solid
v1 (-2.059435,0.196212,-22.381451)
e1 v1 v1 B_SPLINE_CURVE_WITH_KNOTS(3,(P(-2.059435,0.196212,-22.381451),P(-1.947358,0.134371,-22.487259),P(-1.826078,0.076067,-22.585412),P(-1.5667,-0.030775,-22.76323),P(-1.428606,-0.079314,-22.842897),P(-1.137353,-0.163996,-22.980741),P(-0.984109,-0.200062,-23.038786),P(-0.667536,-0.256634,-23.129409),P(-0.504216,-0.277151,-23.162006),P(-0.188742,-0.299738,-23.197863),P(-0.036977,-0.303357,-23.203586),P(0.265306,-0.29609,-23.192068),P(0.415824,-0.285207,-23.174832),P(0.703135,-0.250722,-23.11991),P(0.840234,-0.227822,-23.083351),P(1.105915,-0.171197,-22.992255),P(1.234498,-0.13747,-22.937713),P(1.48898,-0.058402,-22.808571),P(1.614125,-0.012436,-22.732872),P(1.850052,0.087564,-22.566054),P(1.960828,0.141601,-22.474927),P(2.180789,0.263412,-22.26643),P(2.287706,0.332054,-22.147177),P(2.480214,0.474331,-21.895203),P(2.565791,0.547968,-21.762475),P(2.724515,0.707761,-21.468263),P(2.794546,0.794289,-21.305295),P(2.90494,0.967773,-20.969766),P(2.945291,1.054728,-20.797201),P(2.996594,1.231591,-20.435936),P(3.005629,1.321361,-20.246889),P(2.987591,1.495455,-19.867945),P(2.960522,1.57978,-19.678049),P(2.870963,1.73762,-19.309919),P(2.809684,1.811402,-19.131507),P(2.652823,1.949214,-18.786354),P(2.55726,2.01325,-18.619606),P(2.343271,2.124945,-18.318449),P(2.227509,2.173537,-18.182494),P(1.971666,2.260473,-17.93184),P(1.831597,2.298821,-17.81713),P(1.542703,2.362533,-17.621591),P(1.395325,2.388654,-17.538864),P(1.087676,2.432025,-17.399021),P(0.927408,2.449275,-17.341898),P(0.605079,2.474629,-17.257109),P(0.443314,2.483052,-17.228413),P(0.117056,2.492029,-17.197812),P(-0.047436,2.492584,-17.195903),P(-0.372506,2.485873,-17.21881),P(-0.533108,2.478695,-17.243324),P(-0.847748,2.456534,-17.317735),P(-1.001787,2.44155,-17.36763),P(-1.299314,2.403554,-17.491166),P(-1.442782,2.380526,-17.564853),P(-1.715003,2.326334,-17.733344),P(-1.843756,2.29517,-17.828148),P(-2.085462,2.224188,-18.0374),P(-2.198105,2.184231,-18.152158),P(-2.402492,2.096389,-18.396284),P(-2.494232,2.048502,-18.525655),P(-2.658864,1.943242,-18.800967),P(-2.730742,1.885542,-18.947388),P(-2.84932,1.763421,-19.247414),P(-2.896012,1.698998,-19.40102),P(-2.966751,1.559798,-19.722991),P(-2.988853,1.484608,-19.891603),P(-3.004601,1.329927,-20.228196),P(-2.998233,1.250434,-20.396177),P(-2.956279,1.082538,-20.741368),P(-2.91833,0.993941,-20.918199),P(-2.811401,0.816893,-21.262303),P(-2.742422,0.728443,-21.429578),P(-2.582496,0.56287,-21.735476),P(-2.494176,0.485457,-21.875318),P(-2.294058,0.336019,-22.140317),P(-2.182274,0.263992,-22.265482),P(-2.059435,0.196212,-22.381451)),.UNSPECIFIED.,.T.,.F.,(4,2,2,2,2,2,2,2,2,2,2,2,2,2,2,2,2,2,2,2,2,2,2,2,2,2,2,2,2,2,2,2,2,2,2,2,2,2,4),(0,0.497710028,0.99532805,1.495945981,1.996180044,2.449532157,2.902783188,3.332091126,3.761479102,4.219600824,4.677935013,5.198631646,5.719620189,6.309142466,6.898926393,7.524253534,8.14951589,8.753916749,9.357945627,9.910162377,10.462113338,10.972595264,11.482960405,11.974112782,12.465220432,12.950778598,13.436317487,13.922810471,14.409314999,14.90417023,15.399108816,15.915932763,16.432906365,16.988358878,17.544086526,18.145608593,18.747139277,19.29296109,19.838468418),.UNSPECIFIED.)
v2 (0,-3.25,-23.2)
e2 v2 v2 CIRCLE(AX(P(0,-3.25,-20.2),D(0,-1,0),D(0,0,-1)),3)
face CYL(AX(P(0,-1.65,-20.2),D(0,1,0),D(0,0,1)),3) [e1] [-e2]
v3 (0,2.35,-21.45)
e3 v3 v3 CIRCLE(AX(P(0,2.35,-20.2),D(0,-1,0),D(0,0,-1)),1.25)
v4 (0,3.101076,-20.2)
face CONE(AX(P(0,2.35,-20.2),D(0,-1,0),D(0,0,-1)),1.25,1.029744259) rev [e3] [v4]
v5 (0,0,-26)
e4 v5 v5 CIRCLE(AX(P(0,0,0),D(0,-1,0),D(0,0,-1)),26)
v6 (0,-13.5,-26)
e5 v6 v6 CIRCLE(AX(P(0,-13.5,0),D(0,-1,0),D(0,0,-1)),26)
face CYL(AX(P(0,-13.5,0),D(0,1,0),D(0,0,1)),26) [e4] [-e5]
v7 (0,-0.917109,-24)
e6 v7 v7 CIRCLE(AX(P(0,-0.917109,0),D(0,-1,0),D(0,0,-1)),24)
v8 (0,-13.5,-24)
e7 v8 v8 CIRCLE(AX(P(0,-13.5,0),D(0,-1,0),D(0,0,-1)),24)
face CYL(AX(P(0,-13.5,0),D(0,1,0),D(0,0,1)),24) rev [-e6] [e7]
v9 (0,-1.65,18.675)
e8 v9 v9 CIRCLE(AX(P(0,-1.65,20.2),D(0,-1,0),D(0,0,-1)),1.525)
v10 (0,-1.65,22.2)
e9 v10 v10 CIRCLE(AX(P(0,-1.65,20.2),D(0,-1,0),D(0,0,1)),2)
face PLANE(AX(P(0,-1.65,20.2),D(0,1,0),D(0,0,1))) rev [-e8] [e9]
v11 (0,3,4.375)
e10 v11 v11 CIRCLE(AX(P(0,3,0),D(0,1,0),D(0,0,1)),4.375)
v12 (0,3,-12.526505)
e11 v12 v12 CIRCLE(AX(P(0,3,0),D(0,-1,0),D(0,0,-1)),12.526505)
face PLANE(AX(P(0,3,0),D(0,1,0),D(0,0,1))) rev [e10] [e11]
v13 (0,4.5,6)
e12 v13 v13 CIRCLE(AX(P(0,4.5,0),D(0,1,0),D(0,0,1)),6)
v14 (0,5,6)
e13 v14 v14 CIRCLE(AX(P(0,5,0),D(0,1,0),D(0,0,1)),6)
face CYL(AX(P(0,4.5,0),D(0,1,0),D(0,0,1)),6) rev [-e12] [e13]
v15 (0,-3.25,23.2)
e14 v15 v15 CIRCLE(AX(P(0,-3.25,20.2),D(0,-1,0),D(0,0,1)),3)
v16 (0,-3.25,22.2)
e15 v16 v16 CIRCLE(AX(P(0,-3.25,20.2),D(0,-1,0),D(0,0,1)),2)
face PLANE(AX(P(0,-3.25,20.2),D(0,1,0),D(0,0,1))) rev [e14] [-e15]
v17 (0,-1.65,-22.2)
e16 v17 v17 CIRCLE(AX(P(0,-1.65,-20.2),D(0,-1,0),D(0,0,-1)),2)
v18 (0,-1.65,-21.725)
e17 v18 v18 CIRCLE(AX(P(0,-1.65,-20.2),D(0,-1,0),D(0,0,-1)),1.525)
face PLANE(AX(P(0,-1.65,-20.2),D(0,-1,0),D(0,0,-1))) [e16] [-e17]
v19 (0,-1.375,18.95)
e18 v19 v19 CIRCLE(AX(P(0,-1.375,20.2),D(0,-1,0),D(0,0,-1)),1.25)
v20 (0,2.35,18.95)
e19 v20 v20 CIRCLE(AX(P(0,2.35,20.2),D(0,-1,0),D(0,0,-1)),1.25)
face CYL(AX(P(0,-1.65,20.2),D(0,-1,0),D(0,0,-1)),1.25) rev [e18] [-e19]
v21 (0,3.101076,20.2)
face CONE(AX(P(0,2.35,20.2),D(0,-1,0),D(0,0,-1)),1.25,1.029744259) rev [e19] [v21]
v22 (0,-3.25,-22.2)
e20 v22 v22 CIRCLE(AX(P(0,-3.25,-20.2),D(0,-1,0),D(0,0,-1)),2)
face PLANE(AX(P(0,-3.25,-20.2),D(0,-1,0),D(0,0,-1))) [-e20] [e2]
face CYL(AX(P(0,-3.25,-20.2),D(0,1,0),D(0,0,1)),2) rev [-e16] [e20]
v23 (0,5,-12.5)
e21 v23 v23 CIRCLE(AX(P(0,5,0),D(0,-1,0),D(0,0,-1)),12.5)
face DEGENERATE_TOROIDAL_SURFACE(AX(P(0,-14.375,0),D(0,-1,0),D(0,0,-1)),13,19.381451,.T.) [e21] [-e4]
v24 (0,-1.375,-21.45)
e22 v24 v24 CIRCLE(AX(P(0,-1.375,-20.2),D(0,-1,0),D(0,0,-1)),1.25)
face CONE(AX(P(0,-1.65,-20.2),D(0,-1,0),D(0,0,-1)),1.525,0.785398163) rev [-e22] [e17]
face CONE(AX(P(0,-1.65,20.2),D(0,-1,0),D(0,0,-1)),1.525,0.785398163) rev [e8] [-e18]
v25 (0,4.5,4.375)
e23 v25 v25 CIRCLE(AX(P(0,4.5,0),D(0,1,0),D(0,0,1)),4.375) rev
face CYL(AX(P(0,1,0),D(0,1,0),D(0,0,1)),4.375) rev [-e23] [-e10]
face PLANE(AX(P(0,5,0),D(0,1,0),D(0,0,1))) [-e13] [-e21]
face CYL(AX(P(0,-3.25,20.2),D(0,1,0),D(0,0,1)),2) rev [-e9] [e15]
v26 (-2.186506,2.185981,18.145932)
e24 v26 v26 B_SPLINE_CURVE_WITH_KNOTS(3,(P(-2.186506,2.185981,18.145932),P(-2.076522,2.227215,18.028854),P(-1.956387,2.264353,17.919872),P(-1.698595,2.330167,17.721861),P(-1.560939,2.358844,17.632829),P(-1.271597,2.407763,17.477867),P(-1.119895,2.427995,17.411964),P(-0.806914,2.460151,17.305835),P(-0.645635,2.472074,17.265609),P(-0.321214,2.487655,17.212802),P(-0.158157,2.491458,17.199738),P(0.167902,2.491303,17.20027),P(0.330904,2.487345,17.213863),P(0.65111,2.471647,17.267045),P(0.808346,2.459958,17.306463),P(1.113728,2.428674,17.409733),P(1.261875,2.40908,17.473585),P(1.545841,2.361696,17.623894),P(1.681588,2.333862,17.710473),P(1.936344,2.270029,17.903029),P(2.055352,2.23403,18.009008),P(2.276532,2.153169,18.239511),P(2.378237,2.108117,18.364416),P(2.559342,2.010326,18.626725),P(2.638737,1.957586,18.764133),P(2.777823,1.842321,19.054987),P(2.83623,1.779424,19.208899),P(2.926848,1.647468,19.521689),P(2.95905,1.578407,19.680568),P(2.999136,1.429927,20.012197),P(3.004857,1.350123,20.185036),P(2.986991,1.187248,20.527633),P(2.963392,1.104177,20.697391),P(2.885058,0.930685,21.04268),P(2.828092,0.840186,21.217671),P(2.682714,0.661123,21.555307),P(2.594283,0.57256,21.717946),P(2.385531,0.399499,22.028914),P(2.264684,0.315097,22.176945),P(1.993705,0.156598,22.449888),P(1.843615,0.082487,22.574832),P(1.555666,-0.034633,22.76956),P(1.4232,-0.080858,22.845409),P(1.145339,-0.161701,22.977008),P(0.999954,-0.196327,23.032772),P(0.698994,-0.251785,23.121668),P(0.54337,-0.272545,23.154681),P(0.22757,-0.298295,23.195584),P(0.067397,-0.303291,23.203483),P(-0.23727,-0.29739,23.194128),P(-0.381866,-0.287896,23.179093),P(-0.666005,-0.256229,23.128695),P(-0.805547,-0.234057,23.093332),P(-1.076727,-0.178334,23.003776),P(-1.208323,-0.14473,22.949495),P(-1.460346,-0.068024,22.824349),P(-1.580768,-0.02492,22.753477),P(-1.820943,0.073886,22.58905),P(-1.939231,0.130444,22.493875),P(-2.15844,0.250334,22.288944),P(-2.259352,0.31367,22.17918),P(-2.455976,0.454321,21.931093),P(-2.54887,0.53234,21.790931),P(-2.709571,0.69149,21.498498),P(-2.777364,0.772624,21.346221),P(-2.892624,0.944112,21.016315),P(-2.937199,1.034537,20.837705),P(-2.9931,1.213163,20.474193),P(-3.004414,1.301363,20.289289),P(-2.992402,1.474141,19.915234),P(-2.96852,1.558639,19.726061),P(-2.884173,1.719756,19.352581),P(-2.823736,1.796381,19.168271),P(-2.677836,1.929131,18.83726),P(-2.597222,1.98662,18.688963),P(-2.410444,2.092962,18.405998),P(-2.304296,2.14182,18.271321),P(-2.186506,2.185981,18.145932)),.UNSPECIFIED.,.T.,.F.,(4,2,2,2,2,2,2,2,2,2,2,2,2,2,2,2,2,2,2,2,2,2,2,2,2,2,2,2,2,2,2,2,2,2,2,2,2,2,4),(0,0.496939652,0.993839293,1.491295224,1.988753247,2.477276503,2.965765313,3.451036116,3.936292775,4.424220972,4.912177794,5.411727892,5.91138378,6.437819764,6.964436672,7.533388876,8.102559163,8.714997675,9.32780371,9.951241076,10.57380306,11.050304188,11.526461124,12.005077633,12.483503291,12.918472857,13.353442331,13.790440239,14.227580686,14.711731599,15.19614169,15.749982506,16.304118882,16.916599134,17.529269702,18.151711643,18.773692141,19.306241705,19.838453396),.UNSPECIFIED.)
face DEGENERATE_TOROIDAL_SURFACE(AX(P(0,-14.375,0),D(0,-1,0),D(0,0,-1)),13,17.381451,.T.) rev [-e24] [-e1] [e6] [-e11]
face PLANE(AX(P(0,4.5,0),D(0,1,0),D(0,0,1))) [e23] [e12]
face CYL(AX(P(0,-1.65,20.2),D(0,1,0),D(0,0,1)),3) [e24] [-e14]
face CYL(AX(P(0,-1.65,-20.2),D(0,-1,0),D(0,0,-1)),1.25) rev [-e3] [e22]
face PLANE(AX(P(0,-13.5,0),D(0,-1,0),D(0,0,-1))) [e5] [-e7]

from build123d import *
from build123d.topology import SkipClean

# Parameters (mm, degrees)
SKETCH1_R                       = 26
SKETCH3_R                       = 12.5
SKETCH8_R                       = 26
BOSS_EXTRUDE1_DEPTH             = 13.5
CUT_EXTRUDE1_START              = -4
SKETCH10_R                      = 24
CUT_EXTRUDE1_DEPTH              = 4
SKETCH9_R                       = 4.375
CUT_EXTRUDE2_DEPTH              = 4
BOSS_EXTRUDE5_REACH             = 41.17
BOSS_EXTRUDE5_END_MAJOR_RADIUS  = 13
BOSS_EXTRUDE5_END_MINOR_RADIUS  = 17.381450539
SKETCH18_R                      = 3
BOSS_EXTRUDE5_DIRECTION_2_DEPTH = 1.65
M3X0_5_TAPPED_HOLE1_D           = 2.5
M3X0_5_TAPPED_HOLE1_DEPTH       = 4
M3X0_5_TAPPED_HOLE1_CSINK_D     = 3.05
M3X0_5_TAPPED_HOLE1_CSINK_ANGLE = 90
M3X0_5_TAPPED_HOLE1_TIP         = 0.751075774
SKETCH32_R                      = 3
SKETCH32_R_2                    = 2
BOSS_EXTRUDE6_DEPTH             = 1.6
SKETCH35_R                      = 6
CUT_EXTRUDE3_DEPTH              = 0.5


# Read off the part's stored shape, not the designer's step: Shell4
with BuildPart() as part:
    # Sketch1 → Loft2 section 0
    with BuildSketch(Plane(origin=(0, 0, 0), x_dir=(1, 0, 0), z_dir=(0, 1, 0))):
        Circle(SKETCH1_R)
    # Sketch3 → Loft2 section 1
    with BuildSketch(Plane(origin=(0, 5, 0), x_dir=(1, 0, 0), z_dir=(0, 1, 0))):
        Circle(SKETCH3_R)
    loft()

    # Sketch6<5> → Revolve1 (revolve)
    with BuildSketch(Plane(origin=(0, 0, 0), x_dir=(0, 0, -1), z_dir=(1, 0, 0)), mode=Mode.PRIVATE) as revolve1_sk:
        with BuildLine():
            Line((-26, 0), (-12.5, 0))
            Line((-12.5, 0), (-12.5, 5))
            ThreePointArc((-12.5, 5), (-19.731456009, 3.799931224), (-26, 0))
        make_face()
    revolve(revolve1_sk.sketch.rotate(Axis((0, 0, 0), (0, 1, 0)), 180), axis=Axis((0, 0, 0), (0, 1, 0)))

    # Sketch8 → Boss-Extrude1 (add)
    with BuildSketch(Plane.XZ):
        with Locations(Location((0, 0, 0), (0, 0, 270))):
            Circle(SKETCH8_R)
    extrude(amount=BOSS_EXTRUDE1_DEPTH)

    # Shell4 outline → Shell4 (revolve, cut)
    with BuildSketch(Plane.XY):
        with BuildLine():
            ThreePointArc((24, -0.917109272), (18.615849118, 2.074226776), (12.526504653, 3))
            Line((12.526504653, 3), (0, 3))
            Line((0, 3), (0, -11.5))
            Line((0, -11.5), (24, -11.5))
            Line((24, -11.5), (24, -0.917109272))
        make_face()
    revolve(axis=Axis((0, 0, 0), (0, 1, 0)), mode=Mode.SUBTRACT)

    # Sketch10 → Cut-Extrude1 (cut)
    with SkipClean():  # the faces are left unmerged after this step: merging them gives an invalid solid
        with BuildSketch(Plane.XZ.offset(13.5).offset(CUT_EXTRUDE1_START)):
            with Locations(Location((0, 0, 0), (0, 0, 270))):
                Circle(SKETCH10_R)
        extrude(amount=CUT_EXTRUDE1_DEPTH, mode=Mode.SUBTRACT)

    # Sketch9 → Cut-Extrude2 (cut)
    with SkipClean():  # the faces are left unmerged after this step: merging them gives an invalid solid
        with BuildSketch(Plane(origin=(0, 5, 0), x_dir=(1, 0, 0), z_dir=(0, 1, 0))):
            with Locations(Location((0, 0, 0), (0, 0, 270))):
                Circle(SKETCH9_R)
        extrude(amount=-CUT_EXTRUDE2_DEPTH, mode=Mode.SUBTRACT)

    # Boss-Extrude5: up to this torus (the profile starts inside it)
    with SkipClean():  # the faces are left unmerged after this step: merging them gives an invalid solid
        boss_extrude5_end = Plane(origin=(0, -14.375, 0), z_dir=(0, -1, 0)) * Torus(BOSS_EXTRUDE5_END_MAJOR_RADIUS, BOSS_EXTRUDE5_END_MINOR_RADIUS, mode=Mode.PRIVATE)
        # Sketch18 → Boss-Extrude5 (add, up to the surface)
        with BuildSketch(Plane(origin=(0, 0, 0), x_dir=(1, 0, 0), z_dir=(0, 1, 0)), mode=Mode.PRIVATE) as boss_extrude5_sk1:
            with Locations(Location((0, -20.2, 0), (0, 0, 270))):
                Circle(SKETCH18_R)
        boss_extrude5_tool1 = extrude(boss_extrude5_sk1.sketch, amount=BOSS_EXTRUDE5_REACH, mode=Mode.PRIVATE) & boss_extrude5_end
        add(boss_extrude5_tool1.solids().sort_by_distance((0, 0, 20.2))[0])
        # Sketch18 → Boss-Extrude5 (add, up to the surface)
        with BuildSketch(Plane(origin=(0, 0, 0), x_dir=(1, 0, 0), z_dir=(0, 1, 0)), mode=Mode.PRIVATE) as boss_extrude5_sk2:
            with Locations(Location((0, 20.2, 0), (0, 0, 270))):
                Circle(SKETCH18_R)
        boss_extrude5_tool2 = extrude(boss_extrude5_sk2.sketch, amount=BOSS_EXTRUDE5_REACH, mode=Mode.PRIVATE) & boss_extrude5_end
        add(boss_extrude5_tool2.solids().sort_by_distance((0, 0, -20.2))[0])

    # Sketch18 → Boss-Extrude5 direction 2 (add)
    with SkipClean():  # the faces are left unmerged after this step: merging them gives an invalid solid
        with BuildSketch(Plane(origin=(0, 0, 0), x_dir=(1, 0, 0), z_dir=(0, 1, 0))):
            with Locations(Location((0, -20.2, 0), (0, 0, 270))):
                Circle(SKETCH18_R)
            with Locations(Location((0, 20.2, 0), (0, 0, 270))):
                Circle(SKETCH18_R)
        extrude(amount=-BOSS_EXTRUDE5_DIRECTION_2_DEPTH)
    add(part.part.scale(1), mode=Mode.REPLACE)  # the faces are merged on a copy

    # M3x0.5 Tapped Hole1
    with Locations(Plane(origin=(0, -1.65, 0), x_dir=(-1, 0, 0), z_dir=(0, -1, 0))):
        with Locations((0, -20.2), (0, 20.2)):
            CounterSinkHole(M3X0_5_TAPPED_HOLE1_D / 2, M3X0_5_TAPPED_HOLE1_CSINK_D / 2, depth=M3X0_5_TAPPED_HOLE1_DEPTH, counter_sink_angle=M3X0_5_TAPPED_HOLE1_CSINK_ANGLE)
            with Locations((0, 0, -(M3X0_5_TAPPED_HOLE1_DEPTH + M3X0_5_TAPPED_HOLE1_TIP / 2))):  # 118° drill point
                Cone(0, M3X0_5_TAPPED_HOLE1_D / 2, M3X0_5_TAPPED_HOLE1_TIP, mode=Mode.SUBTRACT)

    # Sketch32 → Boss-Extrude6 (add)
    # profile 1 of 2: a face of its own
    with SkipClean():  # the faces are left unmerged after this step: merging them gives an invalid solid
        with BuildSketch(Plane.XZ.offset(1.65)):
            with Locations(Location((0, -20.2, 0), (0, 0, 90))):
                Circle(SKETCH32_R)
            with Locations(Location((0, -20.2, 0), (0, 0, 270))):
                Circle(SKETCH32_R_2, mode=Mode.SUBTRACT)
        # profile 2 of 2: a face of its own
        with BuildSketch(Plane.XZ.offset(1.65)):
            with Locations(Location((0, 20.2, 0), (0, 0, 90))):
                Circle(SKETCH32_R)
            with Locations(Location((0, 20.2, 0), (0, 0, 90))):
                Circle(SKETCH32_R_2, mode=Mode.SUBTRACT)
        extrude(amount=BOSS_EXTRUDE6_DEPTH)

    # Sketch35 → Cut-Extrude3 (cut)
    with SkipClean():  # the faces are left unmerged after this step: merging them gives an invalid solid
        with BuildSketch(Plane(origin=(0, 5, 0), x_dir=(1, 0, 0), z_dir=(0, 1, 0))):
            with Locations(Location((0, 0, 0), (0, 0, 270))):
                Circle(SKETCH35_R)
        extrude(amount=-CUT_EXTRUDE3_DEPTH, mode=Mode.SUBTRACT)


solid = part.part
